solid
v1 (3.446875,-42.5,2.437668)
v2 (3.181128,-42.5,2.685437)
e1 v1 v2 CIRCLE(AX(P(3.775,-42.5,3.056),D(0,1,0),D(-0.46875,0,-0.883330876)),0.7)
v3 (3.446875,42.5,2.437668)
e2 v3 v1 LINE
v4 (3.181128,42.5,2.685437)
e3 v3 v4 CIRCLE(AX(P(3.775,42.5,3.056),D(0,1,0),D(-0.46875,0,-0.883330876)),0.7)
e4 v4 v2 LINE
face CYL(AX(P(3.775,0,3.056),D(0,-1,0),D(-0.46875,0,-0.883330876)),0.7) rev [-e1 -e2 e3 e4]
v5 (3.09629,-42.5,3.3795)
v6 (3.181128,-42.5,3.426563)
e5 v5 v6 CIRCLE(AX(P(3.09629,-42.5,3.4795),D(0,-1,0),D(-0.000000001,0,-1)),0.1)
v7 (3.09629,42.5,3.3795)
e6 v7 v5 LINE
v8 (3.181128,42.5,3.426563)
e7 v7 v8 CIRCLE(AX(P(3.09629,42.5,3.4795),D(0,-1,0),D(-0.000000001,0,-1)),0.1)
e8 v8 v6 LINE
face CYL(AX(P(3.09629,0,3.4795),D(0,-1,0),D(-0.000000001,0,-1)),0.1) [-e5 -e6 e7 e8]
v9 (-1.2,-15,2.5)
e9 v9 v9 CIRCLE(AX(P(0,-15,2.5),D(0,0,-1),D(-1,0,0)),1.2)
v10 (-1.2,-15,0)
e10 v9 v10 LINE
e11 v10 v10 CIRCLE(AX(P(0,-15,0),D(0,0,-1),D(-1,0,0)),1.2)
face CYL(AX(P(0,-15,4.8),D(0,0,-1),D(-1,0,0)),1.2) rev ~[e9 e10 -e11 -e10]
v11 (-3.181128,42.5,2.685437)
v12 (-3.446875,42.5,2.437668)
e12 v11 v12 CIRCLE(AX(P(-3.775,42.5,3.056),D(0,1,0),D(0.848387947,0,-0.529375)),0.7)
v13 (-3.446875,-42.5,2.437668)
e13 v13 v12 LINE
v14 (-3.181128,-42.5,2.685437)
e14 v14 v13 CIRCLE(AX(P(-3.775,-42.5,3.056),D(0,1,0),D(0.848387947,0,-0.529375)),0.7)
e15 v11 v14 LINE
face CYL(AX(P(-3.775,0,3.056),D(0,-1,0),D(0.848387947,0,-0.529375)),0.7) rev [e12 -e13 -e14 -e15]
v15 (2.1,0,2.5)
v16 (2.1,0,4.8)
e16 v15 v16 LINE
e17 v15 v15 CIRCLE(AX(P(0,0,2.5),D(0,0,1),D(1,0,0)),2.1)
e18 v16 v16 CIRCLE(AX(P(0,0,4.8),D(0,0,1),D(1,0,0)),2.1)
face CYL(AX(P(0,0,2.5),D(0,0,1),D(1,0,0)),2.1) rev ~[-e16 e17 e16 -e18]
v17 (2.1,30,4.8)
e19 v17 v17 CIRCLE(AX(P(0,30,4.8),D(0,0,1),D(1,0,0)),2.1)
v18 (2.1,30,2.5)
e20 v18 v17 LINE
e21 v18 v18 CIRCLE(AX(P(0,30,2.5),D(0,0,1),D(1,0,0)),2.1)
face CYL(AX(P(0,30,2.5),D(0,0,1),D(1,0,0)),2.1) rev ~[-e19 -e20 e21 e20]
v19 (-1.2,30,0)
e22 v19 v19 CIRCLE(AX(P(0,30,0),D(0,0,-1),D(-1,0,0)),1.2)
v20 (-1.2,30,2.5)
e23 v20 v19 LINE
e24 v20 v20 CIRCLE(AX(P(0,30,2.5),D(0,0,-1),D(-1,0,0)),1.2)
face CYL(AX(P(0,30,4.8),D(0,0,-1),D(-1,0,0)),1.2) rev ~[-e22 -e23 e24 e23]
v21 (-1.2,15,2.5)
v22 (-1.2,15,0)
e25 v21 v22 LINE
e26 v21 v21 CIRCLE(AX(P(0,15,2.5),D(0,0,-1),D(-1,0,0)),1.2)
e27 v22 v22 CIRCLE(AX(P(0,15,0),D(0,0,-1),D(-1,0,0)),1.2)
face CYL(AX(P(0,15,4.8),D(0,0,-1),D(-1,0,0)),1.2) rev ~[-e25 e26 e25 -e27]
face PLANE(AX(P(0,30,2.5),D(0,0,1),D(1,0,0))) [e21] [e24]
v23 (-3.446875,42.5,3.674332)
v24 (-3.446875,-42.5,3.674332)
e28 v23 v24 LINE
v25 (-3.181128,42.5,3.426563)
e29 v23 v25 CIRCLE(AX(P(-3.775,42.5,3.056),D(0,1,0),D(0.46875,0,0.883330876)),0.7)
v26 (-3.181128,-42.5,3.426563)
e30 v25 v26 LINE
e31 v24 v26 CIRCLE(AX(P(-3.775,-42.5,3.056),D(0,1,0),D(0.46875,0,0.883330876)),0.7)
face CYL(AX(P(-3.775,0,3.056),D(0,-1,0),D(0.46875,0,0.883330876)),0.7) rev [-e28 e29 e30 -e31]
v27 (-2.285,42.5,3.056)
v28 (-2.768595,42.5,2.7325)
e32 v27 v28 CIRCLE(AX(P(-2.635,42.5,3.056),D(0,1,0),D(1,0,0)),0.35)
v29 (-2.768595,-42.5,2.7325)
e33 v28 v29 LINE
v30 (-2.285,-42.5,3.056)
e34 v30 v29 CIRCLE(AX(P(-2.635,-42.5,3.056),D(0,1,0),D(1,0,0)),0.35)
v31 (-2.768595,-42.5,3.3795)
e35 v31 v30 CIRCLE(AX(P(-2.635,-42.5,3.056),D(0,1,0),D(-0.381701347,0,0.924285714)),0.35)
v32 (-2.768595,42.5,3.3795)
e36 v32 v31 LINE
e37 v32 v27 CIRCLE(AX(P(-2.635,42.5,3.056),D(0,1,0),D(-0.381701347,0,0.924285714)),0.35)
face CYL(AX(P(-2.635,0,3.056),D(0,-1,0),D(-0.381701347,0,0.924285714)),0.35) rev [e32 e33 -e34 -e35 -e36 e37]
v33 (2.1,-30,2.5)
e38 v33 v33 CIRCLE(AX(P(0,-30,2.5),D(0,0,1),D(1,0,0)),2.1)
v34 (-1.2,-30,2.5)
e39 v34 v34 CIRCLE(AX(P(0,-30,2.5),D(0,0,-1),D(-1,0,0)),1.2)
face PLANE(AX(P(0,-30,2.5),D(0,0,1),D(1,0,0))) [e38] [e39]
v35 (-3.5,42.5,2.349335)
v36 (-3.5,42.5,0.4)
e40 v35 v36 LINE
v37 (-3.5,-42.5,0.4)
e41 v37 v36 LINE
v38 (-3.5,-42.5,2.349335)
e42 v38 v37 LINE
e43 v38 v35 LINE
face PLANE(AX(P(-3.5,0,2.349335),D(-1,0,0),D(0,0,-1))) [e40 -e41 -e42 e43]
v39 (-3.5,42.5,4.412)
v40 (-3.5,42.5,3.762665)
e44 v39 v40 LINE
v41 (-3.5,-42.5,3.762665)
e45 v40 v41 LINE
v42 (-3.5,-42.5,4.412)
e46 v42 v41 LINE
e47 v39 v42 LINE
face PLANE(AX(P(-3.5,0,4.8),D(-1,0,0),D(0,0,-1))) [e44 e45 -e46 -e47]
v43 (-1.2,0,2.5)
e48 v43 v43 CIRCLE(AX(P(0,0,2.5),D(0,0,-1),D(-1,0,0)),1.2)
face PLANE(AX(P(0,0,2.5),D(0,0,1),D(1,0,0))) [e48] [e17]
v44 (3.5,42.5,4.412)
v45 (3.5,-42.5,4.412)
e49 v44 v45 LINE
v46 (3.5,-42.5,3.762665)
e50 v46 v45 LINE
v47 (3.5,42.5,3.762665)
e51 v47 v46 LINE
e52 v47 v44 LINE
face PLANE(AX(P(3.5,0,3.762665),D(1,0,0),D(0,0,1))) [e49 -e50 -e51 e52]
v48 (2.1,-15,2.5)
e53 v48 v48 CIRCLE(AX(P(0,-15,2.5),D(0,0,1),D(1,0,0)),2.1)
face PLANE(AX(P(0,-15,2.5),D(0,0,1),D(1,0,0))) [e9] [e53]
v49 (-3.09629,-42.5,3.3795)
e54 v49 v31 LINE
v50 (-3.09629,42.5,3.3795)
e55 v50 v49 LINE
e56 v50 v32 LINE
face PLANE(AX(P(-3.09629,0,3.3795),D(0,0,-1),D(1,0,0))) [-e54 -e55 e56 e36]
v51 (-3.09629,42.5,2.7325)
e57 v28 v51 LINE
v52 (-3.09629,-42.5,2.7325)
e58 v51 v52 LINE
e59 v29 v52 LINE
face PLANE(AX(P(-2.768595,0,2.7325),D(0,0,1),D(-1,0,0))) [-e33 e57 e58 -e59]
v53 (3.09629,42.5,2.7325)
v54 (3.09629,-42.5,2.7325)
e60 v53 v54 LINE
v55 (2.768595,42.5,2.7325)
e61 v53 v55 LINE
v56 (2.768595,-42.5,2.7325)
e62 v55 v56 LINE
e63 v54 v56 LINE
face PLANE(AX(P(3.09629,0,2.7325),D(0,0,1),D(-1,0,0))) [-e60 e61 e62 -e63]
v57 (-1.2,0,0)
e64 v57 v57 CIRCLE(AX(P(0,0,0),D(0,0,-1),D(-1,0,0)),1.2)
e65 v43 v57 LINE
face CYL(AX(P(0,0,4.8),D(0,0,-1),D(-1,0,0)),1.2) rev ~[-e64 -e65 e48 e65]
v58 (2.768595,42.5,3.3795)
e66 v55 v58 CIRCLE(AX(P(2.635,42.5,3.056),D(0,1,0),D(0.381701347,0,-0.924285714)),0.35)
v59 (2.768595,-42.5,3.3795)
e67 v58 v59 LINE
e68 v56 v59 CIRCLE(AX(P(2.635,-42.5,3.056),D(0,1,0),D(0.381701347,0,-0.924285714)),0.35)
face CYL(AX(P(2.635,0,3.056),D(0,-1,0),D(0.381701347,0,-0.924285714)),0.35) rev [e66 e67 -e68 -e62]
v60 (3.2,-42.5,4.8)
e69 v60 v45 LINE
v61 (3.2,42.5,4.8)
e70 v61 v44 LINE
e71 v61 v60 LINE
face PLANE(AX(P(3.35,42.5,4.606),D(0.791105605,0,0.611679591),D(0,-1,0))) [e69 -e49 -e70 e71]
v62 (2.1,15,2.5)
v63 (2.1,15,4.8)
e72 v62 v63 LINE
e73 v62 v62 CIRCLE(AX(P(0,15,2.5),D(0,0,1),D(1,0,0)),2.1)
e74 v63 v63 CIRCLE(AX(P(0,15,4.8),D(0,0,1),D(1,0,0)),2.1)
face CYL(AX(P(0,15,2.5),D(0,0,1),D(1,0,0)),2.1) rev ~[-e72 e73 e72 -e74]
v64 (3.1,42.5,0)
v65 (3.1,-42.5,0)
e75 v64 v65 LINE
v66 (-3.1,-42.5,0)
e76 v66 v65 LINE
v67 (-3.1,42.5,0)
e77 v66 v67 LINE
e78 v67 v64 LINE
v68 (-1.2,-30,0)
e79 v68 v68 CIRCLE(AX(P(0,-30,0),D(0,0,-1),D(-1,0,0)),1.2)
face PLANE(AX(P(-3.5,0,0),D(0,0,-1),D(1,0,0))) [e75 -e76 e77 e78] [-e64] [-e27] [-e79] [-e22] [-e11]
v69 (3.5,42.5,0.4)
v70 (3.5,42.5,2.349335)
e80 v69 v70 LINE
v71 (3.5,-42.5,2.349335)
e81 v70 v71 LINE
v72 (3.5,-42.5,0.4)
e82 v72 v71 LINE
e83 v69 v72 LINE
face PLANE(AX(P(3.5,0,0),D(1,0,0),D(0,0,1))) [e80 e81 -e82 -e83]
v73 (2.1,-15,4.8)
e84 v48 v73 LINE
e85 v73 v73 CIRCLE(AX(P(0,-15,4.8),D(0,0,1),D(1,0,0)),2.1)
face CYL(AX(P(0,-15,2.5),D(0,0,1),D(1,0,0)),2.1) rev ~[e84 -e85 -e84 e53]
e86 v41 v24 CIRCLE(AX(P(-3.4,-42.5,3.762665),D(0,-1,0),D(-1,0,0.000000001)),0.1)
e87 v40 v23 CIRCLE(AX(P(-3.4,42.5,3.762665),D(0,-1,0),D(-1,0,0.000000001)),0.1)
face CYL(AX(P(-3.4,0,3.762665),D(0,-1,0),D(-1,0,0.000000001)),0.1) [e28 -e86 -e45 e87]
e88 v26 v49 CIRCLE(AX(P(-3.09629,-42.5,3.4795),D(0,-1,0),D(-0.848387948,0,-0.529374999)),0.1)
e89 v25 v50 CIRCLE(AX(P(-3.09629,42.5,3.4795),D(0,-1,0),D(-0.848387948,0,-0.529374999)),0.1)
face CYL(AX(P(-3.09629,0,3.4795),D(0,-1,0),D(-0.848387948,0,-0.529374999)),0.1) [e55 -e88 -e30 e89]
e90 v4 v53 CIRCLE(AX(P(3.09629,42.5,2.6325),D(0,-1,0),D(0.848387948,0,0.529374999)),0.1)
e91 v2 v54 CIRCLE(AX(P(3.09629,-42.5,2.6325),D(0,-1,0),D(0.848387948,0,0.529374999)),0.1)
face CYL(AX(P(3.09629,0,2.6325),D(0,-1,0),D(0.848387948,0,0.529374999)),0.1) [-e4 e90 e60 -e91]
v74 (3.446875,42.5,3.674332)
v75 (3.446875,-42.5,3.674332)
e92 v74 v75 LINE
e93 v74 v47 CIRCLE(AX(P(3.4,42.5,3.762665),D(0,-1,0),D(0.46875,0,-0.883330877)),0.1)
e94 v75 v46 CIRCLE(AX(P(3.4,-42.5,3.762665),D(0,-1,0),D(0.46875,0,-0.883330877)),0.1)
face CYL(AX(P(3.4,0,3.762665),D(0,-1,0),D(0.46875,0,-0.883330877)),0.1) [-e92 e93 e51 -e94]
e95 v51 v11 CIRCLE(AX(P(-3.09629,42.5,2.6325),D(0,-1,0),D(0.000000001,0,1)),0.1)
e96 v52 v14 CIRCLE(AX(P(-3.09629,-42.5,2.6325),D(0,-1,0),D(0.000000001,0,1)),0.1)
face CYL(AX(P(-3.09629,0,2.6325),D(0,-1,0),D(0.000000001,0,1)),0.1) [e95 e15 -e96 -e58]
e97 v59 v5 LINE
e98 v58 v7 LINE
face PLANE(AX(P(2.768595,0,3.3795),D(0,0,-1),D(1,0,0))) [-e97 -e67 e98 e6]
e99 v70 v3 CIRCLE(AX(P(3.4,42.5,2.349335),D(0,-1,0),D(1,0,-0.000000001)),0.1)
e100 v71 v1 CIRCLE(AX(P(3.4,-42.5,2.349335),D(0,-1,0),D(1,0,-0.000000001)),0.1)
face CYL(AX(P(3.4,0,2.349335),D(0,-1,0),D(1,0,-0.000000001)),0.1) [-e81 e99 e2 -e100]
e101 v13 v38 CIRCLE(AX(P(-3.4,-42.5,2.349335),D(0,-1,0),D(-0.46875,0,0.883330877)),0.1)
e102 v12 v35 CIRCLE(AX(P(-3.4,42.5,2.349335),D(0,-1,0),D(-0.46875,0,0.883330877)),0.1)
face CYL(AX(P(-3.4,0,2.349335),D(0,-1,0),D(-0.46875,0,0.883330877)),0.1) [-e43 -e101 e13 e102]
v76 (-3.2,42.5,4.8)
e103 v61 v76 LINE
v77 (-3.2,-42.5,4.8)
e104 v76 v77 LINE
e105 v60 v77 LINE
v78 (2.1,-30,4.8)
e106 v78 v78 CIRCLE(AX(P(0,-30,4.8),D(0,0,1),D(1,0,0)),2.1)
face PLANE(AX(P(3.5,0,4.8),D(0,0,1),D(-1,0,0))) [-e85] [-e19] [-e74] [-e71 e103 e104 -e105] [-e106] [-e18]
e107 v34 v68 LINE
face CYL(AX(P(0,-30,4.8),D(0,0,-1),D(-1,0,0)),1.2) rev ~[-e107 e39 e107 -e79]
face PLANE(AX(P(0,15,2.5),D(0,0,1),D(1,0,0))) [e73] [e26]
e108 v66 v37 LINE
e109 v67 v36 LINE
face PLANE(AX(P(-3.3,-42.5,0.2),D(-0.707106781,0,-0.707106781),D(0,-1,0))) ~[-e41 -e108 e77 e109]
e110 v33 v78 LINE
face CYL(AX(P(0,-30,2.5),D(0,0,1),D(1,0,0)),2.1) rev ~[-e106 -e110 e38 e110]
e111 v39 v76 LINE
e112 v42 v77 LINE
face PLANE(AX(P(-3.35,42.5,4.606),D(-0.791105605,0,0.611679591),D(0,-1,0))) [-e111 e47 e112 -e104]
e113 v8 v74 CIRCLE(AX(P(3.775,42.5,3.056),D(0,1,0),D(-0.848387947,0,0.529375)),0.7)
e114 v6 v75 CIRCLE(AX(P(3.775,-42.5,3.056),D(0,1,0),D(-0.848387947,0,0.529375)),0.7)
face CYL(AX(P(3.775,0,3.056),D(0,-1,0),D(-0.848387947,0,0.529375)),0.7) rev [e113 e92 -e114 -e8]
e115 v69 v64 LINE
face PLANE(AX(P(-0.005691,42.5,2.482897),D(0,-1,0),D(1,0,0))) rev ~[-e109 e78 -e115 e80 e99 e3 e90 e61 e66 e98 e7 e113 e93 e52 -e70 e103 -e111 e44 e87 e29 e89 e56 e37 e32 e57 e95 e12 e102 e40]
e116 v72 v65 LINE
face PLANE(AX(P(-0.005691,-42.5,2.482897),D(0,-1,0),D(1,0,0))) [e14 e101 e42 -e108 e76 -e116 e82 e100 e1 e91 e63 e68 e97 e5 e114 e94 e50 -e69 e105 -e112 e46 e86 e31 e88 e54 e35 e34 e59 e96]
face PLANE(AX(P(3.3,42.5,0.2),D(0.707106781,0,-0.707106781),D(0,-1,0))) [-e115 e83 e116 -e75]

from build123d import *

# Parameters (mm, degrees)
F1_DEPTH       = 42.5
F2_C1_SIZE2    = 0.3
F2_C1_SIZE     = 0.388
F2_C2_SIZE2    = 0.388
F2_C2_SIZE     = 0.3
F3_SIZE        = 0.4
F5_D           = 2.4
F5_CBORE_D     = 4.2
F5_CBORE_DEPTH = 2.3


with BuildPart() as f1:
    # F0 (on Front) → F1 (new body, symmetric)
    with BuildSketch(Plane.XZ):
        with BuildLine():
            Line((-3.5, 0), (3.5, 0))
            Line((3.5, 0), (3.5, 2.3493352987))
            ThreePointArc((3.5, 2.3493352987), (3.4856956825, 2.4008741191), (3.446875, 2.4376683864))
            ThreePointArc((3.446875, 2.4376683864), (3.2976460443, 2.5440105461), (3.1811284368, 2.6854375))
            ThreePointArc((3.1811284368, 2.6854375), (3.1447986618, 2.7199464122), (3.096289642, 2.7325))
            Line((3.096289642, 2.7325), (2.7685954715, 2.7325))
            ThreePointArc((2.7685954715, 2.7325), (2.285, 3.056), (2.7685954715, 3.3795))
            Line((2.7685954715, 3.3795), (3.096289642, 3.3795))
            ThreePointArc((3.096289642, 3.3795), (3.1447986618, 3.3920535878), (3.1811284368, 3.4265625))
            ThreePointArc((3.1811284368, 3.4265625), (3.2976460443, 3.5679894539), (3.446875, 3.6743316136))
            ThreePointArc((3.446875, 3.6743316136), (3.4856956825, 3.7111258809), (3.5, 3.7626647013))
            Line((3.5, 3.7626647013), (3.5, 4.8))
            Line((3.5, 4.8), (-3.5, 4.8))
            Line((-3.5, 4.8), (-3.5, 3.7626647013))
            ThreePointArc((-3.5, 3.7626647013), (-3.4856956825, 3.7111258809), (-3.446875, 3.6743316136))
            ThreePointArc((-3.446875, 3.6743316136), (-3.2976460443, 3.5679894539), (-3.1811284368, 3.4265625))
            ThreePointArc((-3.1811284368, 3.4265625), (-3.1447986618, 3.3920535878), (-3.096289642, 3.3795))
            Line((-3.096289642, 3.3795), (-2.7685954715, 3.3795))
            ThreePointArc((-2.7685954715, 3.3795), (-2.4403958056, 3.3469109959), (-2.285, 3.056))
            ThreePointArc((-2.285, 3.056), (-2.4403958056, 2.7650890041), (-2.7685954715, 2.7325))
            Line((-2.7685954715, 2.7325), (-3.096289642, 2.7325))
            ThreePointArc((-3.096289642, 2.7325), (-3.1447986618, 2.7199464122), (-3.1811284368, 2.6854375))
            ThreePointArc((-3.1811284368, 2.6854375), (-3.2976460443, 2.5440105461), (-3.446875, 2.4376683864))
            ThreePointArc((-3.446875, 2.4376683864), (-3.4856956825, 2.4008741191), (-3.5, 2.3493352987))
            Line((-3.5, 2.3493352987), (-3.5, 0))
        make_face()
    extrude(amount=F1_DEPTH, both=True)

    # F2: chamfer of 0.3 x 0.388 on 2 edges, made by hand

    # F2_c1
    f2_c1_edges = [f1.edges().sort_by_distance(p)[0] for p in [
        (-3.5, 0, 4.8),
    ]]
    f2_c1_side = f1.faces().sort_by_distance((-3.5, 0, 4.794))[0]
    chamfer(f2_c1_edges, length=F2_C1_SIZE, length2=F2_C1_SIZE2, reference=f2_c1_side)

    # F2_c2
    f2_c2_edges = [f1.edges().sort_by_distance(p)[0] for p in [
        (3.5, 0, 4.8),
    ]]
    f2_c2_side = f1.faces().sort_by_distance((3.494, 0, 4.8))[0]
    chamfer(f2_c2_edges, length=F2_C2_SIZE, length2=F2_C2_SIZE2, reference=f2_c2_side)

    # F3
    f3_edges = [f1.edges().sort_by_distance(p)[0] for p in [
        (3.5, 0, 0),
        (-3.5, 0, 0),
    ]]
    chamfer(f3_edges, length=F3_SIZE)

    # F5 (through all)
    with Locations(Plane.XY.offset(4.8)):
        with Locations((0, 30), (0, 15), (0, 0), (0, -15), (0, -30)):
            CounterBoreHole(F5_D / 2, F5_CBORE_D / 2, F5_CBORE_DEPTH)


solid = f1.part
